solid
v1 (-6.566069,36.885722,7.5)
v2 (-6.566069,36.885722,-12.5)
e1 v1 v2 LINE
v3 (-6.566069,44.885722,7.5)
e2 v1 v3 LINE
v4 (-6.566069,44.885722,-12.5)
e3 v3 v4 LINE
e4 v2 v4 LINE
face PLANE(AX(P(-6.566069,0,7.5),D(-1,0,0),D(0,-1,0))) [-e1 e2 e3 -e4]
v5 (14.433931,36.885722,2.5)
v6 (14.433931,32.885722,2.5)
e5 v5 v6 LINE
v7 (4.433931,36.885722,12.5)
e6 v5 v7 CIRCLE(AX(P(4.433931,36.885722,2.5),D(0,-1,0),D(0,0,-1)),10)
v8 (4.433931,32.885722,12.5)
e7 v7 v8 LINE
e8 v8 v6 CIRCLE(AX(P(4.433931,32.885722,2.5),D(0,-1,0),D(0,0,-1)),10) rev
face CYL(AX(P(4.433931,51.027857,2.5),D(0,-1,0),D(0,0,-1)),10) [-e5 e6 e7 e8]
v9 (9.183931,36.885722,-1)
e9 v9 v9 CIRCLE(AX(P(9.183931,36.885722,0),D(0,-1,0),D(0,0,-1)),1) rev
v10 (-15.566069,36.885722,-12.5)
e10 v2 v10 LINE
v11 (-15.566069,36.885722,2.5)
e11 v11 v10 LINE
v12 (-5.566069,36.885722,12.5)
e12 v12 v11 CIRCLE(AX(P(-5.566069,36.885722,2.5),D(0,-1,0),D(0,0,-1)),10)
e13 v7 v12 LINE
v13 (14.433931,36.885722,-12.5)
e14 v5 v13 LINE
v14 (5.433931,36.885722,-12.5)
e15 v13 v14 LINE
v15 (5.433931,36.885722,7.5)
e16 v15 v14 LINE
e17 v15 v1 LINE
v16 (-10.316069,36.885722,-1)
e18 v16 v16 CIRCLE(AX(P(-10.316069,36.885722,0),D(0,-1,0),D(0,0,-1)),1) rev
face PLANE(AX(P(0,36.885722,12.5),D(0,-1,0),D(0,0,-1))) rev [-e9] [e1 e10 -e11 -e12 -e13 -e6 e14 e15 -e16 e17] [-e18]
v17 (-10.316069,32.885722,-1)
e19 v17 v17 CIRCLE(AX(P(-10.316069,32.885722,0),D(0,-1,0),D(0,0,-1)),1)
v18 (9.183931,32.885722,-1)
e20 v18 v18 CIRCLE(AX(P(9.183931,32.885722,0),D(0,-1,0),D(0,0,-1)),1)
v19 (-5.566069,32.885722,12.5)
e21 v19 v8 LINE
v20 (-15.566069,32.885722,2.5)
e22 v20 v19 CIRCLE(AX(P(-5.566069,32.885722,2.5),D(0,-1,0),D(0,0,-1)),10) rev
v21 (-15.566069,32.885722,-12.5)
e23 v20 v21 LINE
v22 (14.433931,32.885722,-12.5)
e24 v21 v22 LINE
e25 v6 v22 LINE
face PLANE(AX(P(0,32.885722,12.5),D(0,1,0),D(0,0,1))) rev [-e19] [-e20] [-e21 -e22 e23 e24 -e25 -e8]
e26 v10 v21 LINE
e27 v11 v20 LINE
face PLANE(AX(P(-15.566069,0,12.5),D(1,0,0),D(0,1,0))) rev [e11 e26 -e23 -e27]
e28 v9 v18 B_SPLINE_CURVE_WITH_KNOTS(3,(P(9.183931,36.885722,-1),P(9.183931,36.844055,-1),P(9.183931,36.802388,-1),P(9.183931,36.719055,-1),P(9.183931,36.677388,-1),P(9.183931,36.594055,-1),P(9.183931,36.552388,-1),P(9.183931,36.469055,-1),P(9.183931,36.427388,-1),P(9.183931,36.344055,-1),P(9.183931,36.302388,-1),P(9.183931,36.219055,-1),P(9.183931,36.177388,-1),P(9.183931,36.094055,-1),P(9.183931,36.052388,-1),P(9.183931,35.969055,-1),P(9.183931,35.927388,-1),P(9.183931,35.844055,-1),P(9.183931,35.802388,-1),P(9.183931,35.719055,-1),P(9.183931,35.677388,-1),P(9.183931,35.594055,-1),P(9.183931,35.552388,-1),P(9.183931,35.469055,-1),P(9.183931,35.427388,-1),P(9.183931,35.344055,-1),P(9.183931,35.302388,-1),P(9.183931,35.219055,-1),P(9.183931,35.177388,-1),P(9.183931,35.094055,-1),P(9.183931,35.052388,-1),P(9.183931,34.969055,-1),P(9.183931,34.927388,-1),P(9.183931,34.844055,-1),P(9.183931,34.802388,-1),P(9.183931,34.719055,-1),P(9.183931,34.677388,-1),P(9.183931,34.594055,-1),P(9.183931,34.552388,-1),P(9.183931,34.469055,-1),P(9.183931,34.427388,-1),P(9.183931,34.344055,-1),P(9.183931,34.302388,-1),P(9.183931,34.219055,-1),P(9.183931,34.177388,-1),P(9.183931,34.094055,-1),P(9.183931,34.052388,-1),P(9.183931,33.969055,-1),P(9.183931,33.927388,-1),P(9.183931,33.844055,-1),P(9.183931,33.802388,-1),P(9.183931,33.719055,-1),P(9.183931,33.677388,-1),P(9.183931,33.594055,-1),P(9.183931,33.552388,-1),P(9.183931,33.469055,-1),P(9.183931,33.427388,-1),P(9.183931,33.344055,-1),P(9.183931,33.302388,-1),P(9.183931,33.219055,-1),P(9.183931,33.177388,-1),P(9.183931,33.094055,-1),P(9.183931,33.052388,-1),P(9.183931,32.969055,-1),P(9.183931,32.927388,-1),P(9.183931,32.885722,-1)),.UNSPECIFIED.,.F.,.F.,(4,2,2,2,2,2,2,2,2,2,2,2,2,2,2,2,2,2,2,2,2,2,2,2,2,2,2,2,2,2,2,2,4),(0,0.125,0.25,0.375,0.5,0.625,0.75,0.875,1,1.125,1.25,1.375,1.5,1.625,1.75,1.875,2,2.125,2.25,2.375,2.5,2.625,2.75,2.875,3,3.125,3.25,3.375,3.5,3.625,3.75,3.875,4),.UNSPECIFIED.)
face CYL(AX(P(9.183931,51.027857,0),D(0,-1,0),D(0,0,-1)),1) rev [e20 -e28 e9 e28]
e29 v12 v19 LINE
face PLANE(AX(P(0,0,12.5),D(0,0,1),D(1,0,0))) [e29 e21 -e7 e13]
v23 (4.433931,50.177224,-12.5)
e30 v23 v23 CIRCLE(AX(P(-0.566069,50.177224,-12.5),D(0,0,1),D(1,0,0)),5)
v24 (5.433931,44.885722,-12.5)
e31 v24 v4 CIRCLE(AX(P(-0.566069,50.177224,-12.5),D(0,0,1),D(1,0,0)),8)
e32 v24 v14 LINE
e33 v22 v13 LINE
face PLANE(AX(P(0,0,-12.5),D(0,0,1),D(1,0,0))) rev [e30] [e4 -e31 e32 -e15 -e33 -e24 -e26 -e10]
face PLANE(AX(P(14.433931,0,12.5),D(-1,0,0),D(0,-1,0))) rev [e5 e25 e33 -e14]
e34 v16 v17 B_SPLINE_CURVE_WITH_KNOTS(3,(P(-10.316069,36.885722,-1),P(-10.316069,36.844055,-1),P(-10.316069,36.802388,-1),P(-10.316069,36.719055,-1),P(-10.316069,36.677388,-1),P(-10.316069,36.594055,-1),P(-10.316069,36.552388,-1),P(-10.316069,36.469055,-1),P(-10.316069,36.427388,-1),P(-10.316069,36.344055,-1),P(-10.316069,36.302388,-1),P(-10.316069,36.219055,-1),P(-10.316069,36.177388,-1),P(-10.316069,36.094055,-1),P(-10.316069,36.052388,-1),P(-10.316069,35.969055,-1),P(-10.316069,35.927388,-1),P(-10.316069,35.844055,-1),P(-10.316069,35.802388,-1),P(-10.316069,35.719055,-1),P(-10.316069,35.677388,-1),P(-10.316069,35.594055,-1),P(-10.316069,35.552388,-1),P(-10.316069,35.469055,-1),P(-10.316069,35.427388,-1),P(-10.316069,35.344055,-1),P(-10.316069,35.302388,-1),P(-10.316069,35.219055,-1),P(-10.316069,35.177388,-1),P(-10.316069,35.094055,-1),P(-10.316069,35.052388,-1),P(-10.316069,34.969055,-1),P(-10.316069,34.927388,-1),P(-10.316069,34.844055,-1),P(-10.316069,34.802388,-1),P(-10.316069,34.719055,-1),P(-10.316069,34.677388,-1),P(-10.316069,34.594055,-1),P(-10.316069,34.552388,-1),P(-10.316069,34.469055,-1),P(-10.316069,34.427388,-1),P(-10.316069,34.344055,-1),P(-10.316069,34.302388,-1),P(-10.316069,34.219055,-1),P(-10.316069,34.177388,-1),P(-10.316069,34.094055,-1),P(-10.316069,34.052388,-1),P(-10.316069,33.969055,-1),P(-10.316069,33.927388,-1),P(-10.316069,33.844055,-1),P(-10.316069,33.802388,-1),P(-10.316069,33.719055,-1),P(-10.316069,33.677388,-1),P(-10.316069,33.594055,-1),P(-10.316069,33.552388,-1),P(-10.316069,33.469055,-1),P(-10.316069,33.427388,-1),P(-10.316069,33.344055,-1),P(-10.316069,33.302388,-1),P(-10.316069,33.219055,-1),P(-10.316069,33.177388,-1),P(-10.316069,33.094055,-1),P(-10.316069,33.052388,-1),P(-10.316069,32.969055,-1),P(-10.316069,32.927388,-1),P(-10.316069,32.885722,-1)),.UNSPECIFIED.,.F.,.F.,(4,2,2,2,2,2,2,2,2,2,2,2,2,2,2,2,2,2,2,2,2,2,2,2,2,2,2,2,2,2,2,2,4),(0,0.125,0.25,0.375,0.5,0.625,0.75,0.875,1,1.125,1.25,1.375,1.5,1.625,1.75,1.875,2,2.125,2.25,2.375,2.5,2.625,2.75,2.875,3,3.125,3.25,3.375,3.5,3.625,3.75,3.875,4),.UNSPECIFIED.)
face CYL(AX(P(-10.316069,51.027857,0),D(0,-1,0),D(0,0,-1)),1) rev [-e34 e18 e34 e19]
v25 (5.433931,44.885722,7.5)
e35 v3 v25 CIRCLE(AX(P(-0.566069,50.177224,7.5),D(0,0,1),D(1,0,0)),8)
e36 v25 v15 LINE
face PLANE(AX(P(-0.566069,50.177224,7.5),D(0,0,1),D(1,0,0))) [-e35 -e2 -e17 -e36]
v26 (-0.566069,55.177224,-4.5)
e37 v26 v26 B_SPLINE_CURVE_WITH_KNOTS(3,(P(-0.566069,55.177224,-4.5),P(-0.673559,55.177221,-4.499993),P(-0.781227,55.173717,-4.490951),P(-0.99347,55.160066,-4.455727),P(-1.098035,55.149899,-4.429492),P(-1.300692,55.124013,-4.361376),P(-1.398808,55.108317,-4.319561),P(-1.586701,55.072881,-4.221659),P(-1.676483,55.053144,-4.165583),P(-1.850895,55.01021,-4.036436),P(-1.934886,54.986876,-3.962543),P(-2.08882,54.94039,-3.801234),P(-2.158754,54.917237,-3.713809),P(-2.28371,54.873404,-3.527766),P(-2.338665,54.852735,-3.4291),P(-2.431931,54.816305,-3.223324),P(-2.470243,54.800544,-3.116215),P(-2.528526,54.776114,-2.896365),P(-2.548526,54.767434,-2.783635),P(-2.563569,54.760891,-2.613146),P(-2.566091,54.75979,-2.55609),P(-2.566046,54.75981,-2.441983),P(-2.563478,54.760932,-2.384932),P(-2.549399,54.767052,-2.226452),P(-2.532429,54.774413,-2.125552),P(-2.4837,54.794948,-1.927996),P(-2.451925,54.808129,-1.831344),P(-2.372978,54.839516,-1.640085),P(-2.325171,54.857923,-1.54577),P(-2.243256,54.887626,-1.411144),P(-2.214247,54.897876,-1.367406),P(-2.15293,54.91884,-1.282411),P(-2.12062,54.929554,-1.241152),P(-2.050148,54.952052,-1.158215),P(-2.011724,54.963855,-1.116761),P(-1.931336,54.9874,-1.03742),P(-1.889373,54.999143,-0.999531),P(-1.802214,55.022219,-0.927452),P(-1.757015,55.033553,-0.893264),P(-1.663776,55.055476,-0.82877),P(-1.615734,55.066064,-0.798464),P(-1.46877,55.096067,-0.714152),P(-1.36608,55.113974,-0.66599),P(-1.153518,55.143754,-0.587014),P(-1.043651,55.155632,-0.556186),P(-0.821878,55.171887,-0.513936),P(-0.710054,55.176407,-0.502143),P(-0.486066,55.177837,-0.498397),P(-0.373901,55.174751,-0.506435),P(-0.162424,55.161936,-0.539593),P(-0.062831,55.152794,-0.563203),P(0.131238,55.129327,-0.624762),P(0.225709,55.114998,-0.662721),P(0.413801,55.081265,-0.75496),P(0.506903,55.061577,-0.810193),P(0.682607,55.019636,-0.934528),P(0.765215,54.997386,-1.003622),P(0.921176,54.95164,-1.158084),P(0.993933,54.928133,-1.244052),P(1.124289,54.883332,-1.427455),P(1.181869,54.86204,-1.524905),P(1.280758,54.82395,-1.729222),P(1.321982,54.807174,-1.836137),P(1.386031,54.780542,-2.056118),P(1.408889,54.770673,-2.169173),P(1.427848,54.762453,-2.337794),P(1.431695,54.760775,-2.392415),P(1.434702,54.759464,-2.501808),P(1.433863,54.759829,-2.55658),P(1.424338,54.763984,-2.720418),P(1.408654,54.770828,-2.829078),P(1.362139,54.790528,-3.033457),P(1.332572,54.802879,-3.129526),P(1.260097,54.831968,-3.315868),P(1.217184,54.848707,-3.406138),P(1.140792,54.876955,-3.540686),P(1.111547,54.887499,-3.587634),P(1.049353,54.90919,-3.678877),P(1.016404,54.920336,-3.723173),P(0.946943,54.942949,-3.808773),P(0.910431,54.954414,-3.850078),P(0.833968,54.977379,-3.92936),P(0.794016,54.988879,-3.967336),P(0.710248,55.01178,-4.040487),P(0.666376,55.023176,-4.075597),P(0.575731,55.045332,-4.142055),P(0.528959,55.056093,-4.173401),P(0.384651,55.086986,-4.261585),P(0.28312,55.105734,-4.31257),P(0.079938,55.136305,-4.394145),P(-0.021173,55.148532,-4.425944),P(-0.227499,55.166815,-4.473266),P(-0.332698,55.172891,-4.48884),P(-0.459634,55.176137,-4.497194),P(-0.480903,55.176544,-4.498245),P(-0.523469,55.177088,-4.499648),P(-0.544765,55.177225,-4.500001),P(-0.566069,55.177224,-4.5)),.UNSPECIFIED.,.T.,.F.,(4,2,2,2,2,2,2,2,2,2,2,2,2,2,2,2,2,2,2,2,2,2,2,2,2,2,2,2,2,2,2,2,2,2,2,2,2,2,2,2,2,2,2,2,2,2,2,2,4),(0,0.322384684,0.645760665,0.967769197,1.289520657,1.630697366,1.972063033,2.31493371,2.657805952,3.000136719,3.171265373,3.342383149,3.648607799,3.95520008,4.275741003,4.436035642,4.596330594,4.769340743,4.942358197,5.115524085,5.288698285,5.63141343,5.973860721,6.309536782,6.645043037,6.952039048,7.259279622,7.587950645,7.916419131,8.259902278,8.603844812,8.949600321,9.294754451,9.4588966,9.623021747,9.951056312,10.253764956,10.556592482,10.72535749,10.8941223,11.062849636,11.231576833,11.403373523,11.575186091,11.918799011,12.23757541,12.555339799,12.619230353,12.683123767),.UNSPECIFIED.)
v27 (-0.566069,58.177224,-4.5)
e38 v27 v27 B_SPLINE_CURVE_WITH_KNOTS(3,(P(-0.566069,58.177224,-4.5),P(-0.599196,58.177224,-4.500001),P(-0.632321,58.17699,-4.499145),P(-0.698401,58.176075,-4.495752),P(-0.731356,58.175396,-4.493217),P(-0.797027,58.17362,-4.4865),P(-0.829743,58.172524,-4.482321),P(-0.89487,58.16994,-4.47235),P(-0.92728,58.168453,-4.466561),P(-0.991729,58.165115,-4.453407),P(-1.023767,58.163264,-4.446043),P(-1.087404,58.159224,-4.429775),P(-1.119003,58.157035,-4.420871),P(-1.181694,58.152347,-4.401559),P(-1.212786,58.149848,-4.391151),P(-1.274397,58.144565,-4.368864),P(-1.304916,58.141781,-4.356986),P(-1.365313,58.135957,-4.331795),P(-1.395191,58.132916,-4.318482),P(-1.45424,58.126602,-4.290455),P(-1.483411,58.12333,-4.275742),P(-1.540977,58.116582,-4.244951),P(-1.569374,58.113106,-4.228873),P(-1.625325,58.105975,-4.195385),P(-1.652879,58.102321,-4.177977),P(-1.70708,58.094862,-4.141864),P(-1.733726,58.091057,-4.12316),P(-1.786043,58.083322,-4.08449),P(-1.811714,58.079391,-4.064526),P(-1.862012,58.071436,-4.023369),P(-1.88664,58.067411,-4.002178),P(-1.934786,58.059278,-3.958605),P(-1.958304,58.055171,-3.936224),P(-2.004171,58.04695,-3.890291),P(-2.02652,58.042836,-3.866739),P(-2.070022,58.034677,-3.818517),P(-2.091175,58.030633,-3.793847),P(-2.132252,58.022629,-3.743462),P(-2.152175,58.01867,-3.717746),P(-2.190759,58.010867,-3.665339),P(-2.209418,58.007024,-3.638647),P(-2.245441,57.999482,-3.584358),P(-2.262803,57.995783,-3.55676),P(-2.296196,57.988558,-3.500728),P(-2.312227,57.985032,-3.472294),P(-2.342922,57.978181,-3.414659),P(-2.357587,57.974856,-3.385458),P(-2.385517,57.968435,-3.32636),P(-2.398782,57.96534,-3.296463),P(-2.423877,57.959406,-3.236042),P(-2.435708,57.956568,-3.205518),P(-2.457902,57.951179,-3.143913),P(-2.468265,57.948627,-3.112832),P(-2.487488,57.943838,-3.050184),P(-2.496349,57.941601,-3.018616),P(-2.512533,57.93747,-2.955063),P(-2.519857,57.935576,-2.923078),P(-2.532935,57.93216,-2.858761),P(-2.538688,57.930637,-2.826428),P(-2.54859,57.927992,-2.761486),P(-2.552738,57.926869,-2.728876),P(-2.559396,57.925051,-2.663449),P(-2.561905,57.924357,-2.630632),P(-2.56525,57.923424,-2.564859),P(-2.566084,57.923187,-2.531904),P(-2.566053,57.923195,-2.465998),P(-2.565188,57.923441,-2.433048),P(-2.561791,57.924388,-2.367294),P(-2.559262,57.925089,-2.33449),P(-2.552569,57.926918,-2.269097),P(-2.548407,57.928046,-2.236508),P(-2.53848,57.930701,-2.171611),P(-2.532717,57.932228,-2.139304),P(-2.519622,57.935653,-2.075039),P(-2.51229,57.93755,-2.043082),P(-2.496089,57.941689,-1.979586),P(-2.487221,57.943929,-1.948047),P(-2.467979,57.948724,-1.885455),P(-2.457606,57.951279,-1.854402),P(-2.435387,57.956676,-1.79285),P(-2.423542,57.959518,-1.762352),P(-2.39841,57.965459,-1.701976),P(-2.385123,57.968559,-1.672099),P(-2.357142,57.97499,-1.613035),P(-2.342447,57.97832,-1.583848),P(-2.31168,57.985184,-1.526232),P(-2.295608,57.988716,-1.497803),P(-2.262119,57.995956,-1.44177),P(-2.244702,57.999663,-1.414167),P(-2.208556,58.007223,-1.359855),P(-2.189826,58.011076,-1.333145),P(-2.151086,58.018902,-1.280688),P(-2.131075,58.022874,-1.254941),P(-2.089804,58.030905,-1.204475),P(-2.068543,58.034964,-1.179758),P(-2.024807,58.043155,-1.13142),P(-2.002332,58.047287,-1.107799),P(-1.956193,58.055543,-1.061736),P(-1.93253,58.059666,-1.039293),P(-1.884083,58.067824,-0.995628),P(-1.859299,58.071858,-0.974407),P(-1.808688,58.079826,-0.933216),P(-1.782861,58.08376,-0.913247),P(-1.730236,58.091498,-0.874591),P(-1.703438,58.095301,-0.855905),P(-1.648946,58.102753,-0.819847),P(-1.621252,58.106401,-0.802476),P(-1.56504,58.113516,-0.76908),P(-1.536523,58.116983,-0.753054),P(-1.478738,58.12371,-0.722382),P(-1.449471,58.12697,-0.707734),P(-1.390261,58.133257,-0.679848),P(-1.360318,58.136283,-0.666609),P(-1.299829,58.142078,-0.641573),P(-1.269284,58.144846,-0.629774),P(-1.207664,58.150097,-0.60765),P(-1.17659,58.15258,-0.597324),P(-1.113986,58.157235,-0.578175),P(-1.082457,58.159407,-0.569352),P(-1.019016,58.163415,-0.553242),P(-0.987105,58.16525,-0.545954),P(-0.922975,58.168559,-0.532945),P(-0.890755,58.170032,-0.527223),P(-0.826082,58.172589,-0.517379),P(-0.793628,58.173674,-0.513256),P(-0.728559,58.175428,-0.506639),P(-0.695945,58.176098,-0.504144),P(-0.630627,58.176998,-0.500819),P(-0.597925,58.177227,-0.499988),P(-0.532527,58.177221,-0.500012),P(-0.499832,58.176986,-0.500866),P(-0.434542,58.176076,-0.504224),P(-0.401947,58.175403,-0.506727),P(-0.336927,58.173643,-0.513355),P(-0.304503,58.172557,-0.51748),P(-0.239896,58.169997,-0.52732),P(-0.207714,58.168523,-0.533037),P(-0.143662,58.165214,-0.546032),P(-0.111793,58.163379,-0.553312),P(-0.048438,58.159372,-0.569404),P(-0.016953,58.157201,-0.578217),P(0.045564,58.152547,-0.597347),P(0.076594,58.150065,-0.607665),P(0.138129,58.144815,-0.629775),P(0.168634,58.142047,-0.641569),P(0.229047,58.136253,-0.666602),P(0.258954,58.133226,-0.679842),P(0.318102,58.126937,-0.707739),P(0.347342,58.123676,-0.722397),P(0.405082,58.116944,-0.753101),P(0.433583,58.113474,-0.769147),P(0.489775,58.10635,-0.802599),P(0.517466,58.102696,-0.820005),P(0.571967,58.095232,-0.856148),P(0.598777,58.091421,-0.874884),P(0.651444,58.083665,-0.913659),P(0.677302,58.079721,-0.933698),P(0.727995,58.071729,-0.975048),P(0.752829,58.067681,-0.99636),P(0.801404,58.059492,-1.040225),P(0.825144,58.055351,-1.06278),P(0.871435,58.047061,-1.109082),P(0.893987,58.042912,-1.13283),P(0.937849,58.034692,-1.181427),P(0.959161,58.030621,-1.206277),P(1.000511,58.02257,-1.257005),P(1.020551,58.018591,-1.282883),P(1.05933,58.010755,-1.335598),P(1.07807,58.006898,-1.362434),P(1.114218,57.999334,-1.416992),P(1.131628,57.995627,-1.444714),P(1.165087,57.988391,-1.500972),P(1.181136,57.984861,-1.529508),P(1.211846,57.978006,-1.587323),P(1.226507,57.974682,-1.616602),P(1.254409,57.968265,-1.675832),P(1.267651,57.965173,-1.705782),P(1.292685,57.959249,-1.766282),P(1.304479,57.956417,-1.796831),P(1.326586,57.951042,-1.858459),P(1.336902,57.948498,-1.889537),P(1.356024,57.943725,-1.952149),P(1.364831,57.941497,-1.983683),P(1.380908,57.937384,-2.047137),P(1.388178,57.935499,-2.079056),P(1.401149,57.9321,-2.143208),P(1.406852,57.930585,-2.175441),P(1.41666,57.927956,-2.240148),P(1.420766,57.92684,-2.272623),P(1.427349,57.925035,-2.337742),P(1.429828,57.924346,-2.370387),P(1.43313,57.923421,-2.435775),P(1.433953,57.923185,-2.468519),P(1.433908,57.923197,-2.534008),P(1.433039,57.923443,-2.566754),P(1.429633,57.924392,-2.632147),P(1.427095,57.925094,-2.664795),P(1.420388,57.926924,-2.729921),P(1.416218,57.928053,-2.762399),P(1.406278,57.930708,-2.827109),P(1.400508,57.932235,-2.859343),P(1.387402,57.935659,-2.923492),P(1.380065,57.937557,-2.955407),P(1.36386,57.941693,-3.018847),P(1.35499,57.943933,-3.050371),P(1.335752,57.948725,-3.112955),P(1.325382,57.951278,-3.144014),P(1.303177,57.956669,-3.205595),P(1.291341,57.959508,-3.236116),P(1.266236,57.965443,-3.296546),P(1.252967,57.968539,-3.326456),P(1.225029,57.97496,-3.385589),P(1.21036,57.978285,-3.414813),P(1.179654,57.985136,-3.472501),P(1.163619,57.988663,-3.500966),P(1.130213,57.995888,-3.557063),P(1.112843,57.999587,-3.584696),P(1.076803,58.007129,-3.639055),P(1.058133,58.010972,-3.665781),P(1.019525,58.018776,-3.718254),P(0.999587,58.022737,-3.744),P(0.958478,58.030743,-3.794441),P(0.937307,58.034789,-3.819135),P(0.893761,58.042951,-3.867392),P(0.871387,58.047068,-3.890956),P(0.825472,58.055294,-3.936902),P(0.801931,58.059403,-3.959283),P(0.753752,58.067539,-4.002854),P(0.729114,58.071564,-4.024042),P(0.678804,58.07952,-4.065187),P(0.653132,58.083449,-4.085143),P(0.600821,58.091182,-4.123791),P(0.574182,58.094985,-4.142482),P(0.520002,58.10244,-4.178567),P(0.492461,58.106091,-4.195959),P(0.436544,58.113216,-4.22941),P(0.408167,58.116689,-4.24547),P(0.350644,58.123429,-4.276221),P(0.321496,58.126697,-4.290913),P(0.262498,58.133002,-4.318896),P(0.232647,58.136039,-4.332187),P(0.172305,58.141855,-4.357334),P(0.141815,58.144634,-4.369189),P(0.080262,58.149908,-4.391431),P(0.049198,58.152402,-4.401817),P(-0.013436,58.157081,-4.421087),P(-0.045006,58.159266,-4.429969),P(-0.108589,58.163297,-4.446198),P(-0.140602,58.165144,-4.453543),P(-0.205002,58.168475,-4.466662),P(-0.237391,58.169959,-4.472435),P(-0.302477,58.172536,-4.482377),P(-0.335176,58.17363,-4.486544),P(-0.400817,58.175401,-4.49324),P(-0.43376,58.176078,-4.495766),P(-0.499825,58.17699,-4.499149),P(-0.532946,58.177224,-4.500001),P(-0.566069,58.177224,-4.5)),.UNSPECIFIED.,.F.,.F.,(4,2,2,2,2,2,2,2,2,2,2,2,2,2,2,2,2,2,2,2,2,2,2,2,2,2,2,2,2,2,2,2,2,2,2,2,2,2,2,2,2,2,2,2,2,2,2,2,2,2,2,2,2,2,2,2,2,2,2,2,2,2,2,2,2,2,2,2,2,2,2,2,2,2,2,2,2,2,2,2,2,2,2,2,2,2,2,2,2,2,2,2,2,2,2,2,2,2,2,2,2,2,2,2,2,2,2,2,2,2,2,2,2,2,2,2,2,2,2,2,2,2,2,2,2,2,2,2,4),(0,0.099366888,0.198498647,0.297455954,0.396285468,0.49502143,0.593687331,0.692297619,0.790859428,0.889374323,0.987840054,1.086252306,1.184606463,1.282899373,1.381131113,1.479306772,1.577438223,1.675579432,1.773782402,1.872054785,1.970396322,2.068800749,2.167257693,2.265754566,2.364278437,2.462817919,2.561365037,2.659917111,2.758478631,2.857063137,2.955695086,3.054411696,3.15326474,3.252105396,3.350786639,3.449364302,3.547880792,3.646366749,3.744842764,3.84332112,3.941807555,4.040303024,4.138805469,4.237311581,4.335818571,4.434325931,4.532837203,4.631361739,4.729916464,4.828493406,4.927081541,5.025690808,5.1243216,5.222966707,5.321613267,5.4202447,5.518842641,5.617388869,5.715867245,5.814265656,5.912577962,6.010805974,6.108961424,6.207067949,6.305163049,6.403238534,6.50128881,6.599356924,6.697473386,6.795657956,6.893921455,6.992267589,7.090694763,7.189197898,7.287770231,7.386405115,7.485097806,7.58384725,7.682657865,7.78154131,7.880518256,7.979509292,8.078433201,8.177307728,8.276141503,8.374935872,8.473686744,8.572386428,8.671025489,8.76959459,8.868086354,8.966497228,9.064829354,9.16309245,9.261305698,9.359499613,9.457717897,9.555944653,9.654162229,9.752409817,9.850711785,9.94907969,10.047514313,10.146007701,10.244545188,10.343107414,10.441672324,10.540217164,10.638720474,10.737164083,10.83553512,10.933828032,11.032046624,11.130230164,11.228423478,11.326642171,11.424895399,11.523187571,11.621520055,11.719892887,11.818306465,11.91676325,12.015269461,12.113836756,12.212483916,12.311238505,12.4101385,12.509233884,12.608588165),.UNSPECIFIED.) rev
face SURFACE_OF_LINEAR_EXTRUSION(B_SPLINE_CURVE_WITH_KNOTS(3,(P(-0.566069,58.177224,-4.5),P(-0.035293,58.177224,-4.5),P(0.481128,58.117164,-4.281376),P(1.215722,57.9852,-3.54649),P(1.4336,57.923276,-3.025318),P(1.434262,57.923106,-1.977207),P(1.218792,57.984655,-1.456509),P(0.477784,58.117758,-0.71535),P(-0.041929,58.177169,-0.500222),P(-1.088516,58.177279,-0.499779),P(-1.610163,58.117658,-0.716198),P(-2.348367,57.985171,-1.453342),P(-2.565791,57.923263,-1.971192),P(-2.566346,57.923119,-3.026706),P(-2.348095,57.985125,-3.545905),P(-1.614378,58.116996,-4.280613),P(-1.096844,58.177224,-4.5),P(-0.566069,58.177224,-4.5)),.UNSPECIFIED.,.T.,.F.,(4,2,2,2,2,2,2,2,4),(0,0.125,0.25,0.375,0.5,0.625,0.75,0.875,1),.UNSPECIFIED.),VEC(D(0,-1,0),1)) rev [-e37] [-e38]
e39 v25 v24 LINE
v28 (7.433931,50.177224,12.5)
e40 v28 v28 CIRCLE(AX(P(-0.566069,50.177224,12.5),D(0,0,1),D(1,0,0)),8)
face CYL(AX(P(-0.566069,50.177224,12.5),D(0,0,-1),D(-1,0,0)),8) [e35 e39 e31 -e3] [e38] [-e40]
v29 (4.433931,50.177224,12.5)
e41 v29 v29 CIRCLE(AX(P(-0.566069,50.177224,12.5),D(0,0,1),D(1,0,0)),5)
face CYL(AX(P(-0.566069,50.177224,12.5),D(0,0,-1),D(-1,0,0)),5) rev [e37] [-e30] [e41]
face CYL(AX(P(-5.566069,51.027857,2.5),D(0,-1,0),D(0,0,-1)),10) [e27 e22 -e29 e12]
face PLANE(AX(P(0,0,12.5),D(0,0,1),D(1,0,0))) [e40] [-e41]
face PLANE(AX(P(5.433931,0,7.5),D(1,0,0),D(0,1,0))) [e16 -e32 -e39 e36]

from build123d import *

# Parameters (mm, degrees)
SKETCH1_R             = 8
SKETCH1_R_2           = 5
BOSS_EXTRUDE1_DEPTH   = 12.5
SKETCH1_W             = 30
SKETCH1_H             = 4
BOSS_EXTRUDE1_2_DEPTH = 12.5
BOSS_EXTRUDE2_START   = 7.5
BOSS_EXTRUDE2_DEPTH   = 20
SKETCH2_R             = 1
CUT_EXTRUDE1_DEPTH    = 4
CUT_EXTRUDE2_START    = -26
CUT_EXTRUDE2_DEPTH    = 5


with BuildPart() as part:
    # Sketch1 → Boss-Extrude1 (new, symmetric)
    with BuildSketch(Plane.XY):
        with Locations((-0.566068823, 50.177224178)):
            Circle(SKETCH1_R)
        with Locations((-0.566068823, 50.177224178)):
            Circle(SKETCH1_R_2, mode=Mode.SUBTRACT)
    extrude(amount=BOSS_EXTRUDE1_DEPTH, both=True)



with BuildPart() as body_2:
    # Sketch1 → Boss-Extrude1 2 (new, symmetric)
    with BuildSketch(Plane.XY):
        with Locations((-0.566068823, 34.885721556)):
            Rectangle(SKETCH1_W, SKETCH1_H)
    extrude(amount=BOSS_EXTRUDE1_2_DEPTH, both=True)


with BuildPart() as part_1:
    add(part.part)

    add(body_2.part)  # Boss-Extrude2 merges body 2
    # Sketch1<5> → Boss-Extrude2 (add)
    with BuildSketch(Plane.XY.offset(BOSS_EXTRUDE2_START)):
        with BuildLine():
            Line((-6.566068823, 44.885721556), (-6.566068823, 36.885721556))
            Line((-6.566068823, 36.885721556), (5.433931177, 36.885721556))
            Line((5.433931177, 36.885721556), (5.433931177, 44.885721556))
            ThreePointArc((5.433931177, 44.885721556), (-0.566068823, 42.177224178), (-6.566068823, 44.885721556))
        make_face()
    extrude(amount=-BOSS_EXTRUDE2_DEPTH)

    # Sketch2 → Cut-Extrude1 (cut)
    with BuildSketch(Plane.XZ.offset(-32.885721556)):
        with BuildLine():
            ThreePointArc((-15.566068823, 2.5), (-12.637136635, 9.571067812), (-5.566068823, 12.5))
            Line((-5.566068823, 12.5), (-15.566068823, 12.5))
            Line((-15.566068823, 12.5), (-15.566068823, 2.5))
        make_face()
        with Locations(Location((-10.316068823, 0, 0), (0, 0, 270))):
            Circle(SKETCH2_R)
        with BuildLine():
            Line((14.433931177, 12.5), (4.433931177, 12.5))
            ThreePointArc((4.433931177, 12.5), (11.504998989, 9.571067812), (14.433931177, 2.5))
            Line((14.433931177, 2.5), (14.433931177, 12.5))
        make_face()
        with Locations(Location((9.183931177, 0, 0), (0, 0, 270))):
            Circle(SKETCH2_R)
    extrude(amount=-CUT_EXTRUDE1_DEPTH, mode=Mode.SUBTRACT)

    # Cut-Extrude2: read off the stored shape, not the designer's step
    # Cut-Extrude2 outline → Cut-Extrude2 (cut)
    with BuildSketch(Plane.XZ.offset(-32.885721556).offset(CUT_EXTRUDE2_START)):
        with BuildLine():
            add(Edge.make_bspline(
                [(-0.566068823, -4.5), (-0.035293393, -4.5), (0.481128127, -4.281375894), (1.215722466, -3.546490005), (1.433600027, -3.025317772), (1.434261529, -1.977206776), (1.218792073, -1.456508795), (0.477783673, -0.715350376), (-0.041929223, -0.500221589), (-1.08851599, -0.499778769), (-1.610163203, -0.716198326), (-2.348367378, -1.45334182), (-2.565791182, -1.971191938), (-2.566345912, -3.026705842), (-2.348095204, -3.545904648), (-1.614377567, -4.28061319), (-1.096844254, -4.5), (-0.566068823, -4.5)],
                knots=[0, 0, 0, 0, 0.125, 0.125, 0.25, 0.25, 0.375, 0.375, 0.5, 0.5, 0.625, 0.625, 0.75, 0.75, 0.875, 0.875, 1, 1, 1, 1], degree=3))
        make_face()
    extrude(amount=CUT_EXTRUDE2_DEPTH, mode=Mode.SUBTRACT)


solid = part_1.part
